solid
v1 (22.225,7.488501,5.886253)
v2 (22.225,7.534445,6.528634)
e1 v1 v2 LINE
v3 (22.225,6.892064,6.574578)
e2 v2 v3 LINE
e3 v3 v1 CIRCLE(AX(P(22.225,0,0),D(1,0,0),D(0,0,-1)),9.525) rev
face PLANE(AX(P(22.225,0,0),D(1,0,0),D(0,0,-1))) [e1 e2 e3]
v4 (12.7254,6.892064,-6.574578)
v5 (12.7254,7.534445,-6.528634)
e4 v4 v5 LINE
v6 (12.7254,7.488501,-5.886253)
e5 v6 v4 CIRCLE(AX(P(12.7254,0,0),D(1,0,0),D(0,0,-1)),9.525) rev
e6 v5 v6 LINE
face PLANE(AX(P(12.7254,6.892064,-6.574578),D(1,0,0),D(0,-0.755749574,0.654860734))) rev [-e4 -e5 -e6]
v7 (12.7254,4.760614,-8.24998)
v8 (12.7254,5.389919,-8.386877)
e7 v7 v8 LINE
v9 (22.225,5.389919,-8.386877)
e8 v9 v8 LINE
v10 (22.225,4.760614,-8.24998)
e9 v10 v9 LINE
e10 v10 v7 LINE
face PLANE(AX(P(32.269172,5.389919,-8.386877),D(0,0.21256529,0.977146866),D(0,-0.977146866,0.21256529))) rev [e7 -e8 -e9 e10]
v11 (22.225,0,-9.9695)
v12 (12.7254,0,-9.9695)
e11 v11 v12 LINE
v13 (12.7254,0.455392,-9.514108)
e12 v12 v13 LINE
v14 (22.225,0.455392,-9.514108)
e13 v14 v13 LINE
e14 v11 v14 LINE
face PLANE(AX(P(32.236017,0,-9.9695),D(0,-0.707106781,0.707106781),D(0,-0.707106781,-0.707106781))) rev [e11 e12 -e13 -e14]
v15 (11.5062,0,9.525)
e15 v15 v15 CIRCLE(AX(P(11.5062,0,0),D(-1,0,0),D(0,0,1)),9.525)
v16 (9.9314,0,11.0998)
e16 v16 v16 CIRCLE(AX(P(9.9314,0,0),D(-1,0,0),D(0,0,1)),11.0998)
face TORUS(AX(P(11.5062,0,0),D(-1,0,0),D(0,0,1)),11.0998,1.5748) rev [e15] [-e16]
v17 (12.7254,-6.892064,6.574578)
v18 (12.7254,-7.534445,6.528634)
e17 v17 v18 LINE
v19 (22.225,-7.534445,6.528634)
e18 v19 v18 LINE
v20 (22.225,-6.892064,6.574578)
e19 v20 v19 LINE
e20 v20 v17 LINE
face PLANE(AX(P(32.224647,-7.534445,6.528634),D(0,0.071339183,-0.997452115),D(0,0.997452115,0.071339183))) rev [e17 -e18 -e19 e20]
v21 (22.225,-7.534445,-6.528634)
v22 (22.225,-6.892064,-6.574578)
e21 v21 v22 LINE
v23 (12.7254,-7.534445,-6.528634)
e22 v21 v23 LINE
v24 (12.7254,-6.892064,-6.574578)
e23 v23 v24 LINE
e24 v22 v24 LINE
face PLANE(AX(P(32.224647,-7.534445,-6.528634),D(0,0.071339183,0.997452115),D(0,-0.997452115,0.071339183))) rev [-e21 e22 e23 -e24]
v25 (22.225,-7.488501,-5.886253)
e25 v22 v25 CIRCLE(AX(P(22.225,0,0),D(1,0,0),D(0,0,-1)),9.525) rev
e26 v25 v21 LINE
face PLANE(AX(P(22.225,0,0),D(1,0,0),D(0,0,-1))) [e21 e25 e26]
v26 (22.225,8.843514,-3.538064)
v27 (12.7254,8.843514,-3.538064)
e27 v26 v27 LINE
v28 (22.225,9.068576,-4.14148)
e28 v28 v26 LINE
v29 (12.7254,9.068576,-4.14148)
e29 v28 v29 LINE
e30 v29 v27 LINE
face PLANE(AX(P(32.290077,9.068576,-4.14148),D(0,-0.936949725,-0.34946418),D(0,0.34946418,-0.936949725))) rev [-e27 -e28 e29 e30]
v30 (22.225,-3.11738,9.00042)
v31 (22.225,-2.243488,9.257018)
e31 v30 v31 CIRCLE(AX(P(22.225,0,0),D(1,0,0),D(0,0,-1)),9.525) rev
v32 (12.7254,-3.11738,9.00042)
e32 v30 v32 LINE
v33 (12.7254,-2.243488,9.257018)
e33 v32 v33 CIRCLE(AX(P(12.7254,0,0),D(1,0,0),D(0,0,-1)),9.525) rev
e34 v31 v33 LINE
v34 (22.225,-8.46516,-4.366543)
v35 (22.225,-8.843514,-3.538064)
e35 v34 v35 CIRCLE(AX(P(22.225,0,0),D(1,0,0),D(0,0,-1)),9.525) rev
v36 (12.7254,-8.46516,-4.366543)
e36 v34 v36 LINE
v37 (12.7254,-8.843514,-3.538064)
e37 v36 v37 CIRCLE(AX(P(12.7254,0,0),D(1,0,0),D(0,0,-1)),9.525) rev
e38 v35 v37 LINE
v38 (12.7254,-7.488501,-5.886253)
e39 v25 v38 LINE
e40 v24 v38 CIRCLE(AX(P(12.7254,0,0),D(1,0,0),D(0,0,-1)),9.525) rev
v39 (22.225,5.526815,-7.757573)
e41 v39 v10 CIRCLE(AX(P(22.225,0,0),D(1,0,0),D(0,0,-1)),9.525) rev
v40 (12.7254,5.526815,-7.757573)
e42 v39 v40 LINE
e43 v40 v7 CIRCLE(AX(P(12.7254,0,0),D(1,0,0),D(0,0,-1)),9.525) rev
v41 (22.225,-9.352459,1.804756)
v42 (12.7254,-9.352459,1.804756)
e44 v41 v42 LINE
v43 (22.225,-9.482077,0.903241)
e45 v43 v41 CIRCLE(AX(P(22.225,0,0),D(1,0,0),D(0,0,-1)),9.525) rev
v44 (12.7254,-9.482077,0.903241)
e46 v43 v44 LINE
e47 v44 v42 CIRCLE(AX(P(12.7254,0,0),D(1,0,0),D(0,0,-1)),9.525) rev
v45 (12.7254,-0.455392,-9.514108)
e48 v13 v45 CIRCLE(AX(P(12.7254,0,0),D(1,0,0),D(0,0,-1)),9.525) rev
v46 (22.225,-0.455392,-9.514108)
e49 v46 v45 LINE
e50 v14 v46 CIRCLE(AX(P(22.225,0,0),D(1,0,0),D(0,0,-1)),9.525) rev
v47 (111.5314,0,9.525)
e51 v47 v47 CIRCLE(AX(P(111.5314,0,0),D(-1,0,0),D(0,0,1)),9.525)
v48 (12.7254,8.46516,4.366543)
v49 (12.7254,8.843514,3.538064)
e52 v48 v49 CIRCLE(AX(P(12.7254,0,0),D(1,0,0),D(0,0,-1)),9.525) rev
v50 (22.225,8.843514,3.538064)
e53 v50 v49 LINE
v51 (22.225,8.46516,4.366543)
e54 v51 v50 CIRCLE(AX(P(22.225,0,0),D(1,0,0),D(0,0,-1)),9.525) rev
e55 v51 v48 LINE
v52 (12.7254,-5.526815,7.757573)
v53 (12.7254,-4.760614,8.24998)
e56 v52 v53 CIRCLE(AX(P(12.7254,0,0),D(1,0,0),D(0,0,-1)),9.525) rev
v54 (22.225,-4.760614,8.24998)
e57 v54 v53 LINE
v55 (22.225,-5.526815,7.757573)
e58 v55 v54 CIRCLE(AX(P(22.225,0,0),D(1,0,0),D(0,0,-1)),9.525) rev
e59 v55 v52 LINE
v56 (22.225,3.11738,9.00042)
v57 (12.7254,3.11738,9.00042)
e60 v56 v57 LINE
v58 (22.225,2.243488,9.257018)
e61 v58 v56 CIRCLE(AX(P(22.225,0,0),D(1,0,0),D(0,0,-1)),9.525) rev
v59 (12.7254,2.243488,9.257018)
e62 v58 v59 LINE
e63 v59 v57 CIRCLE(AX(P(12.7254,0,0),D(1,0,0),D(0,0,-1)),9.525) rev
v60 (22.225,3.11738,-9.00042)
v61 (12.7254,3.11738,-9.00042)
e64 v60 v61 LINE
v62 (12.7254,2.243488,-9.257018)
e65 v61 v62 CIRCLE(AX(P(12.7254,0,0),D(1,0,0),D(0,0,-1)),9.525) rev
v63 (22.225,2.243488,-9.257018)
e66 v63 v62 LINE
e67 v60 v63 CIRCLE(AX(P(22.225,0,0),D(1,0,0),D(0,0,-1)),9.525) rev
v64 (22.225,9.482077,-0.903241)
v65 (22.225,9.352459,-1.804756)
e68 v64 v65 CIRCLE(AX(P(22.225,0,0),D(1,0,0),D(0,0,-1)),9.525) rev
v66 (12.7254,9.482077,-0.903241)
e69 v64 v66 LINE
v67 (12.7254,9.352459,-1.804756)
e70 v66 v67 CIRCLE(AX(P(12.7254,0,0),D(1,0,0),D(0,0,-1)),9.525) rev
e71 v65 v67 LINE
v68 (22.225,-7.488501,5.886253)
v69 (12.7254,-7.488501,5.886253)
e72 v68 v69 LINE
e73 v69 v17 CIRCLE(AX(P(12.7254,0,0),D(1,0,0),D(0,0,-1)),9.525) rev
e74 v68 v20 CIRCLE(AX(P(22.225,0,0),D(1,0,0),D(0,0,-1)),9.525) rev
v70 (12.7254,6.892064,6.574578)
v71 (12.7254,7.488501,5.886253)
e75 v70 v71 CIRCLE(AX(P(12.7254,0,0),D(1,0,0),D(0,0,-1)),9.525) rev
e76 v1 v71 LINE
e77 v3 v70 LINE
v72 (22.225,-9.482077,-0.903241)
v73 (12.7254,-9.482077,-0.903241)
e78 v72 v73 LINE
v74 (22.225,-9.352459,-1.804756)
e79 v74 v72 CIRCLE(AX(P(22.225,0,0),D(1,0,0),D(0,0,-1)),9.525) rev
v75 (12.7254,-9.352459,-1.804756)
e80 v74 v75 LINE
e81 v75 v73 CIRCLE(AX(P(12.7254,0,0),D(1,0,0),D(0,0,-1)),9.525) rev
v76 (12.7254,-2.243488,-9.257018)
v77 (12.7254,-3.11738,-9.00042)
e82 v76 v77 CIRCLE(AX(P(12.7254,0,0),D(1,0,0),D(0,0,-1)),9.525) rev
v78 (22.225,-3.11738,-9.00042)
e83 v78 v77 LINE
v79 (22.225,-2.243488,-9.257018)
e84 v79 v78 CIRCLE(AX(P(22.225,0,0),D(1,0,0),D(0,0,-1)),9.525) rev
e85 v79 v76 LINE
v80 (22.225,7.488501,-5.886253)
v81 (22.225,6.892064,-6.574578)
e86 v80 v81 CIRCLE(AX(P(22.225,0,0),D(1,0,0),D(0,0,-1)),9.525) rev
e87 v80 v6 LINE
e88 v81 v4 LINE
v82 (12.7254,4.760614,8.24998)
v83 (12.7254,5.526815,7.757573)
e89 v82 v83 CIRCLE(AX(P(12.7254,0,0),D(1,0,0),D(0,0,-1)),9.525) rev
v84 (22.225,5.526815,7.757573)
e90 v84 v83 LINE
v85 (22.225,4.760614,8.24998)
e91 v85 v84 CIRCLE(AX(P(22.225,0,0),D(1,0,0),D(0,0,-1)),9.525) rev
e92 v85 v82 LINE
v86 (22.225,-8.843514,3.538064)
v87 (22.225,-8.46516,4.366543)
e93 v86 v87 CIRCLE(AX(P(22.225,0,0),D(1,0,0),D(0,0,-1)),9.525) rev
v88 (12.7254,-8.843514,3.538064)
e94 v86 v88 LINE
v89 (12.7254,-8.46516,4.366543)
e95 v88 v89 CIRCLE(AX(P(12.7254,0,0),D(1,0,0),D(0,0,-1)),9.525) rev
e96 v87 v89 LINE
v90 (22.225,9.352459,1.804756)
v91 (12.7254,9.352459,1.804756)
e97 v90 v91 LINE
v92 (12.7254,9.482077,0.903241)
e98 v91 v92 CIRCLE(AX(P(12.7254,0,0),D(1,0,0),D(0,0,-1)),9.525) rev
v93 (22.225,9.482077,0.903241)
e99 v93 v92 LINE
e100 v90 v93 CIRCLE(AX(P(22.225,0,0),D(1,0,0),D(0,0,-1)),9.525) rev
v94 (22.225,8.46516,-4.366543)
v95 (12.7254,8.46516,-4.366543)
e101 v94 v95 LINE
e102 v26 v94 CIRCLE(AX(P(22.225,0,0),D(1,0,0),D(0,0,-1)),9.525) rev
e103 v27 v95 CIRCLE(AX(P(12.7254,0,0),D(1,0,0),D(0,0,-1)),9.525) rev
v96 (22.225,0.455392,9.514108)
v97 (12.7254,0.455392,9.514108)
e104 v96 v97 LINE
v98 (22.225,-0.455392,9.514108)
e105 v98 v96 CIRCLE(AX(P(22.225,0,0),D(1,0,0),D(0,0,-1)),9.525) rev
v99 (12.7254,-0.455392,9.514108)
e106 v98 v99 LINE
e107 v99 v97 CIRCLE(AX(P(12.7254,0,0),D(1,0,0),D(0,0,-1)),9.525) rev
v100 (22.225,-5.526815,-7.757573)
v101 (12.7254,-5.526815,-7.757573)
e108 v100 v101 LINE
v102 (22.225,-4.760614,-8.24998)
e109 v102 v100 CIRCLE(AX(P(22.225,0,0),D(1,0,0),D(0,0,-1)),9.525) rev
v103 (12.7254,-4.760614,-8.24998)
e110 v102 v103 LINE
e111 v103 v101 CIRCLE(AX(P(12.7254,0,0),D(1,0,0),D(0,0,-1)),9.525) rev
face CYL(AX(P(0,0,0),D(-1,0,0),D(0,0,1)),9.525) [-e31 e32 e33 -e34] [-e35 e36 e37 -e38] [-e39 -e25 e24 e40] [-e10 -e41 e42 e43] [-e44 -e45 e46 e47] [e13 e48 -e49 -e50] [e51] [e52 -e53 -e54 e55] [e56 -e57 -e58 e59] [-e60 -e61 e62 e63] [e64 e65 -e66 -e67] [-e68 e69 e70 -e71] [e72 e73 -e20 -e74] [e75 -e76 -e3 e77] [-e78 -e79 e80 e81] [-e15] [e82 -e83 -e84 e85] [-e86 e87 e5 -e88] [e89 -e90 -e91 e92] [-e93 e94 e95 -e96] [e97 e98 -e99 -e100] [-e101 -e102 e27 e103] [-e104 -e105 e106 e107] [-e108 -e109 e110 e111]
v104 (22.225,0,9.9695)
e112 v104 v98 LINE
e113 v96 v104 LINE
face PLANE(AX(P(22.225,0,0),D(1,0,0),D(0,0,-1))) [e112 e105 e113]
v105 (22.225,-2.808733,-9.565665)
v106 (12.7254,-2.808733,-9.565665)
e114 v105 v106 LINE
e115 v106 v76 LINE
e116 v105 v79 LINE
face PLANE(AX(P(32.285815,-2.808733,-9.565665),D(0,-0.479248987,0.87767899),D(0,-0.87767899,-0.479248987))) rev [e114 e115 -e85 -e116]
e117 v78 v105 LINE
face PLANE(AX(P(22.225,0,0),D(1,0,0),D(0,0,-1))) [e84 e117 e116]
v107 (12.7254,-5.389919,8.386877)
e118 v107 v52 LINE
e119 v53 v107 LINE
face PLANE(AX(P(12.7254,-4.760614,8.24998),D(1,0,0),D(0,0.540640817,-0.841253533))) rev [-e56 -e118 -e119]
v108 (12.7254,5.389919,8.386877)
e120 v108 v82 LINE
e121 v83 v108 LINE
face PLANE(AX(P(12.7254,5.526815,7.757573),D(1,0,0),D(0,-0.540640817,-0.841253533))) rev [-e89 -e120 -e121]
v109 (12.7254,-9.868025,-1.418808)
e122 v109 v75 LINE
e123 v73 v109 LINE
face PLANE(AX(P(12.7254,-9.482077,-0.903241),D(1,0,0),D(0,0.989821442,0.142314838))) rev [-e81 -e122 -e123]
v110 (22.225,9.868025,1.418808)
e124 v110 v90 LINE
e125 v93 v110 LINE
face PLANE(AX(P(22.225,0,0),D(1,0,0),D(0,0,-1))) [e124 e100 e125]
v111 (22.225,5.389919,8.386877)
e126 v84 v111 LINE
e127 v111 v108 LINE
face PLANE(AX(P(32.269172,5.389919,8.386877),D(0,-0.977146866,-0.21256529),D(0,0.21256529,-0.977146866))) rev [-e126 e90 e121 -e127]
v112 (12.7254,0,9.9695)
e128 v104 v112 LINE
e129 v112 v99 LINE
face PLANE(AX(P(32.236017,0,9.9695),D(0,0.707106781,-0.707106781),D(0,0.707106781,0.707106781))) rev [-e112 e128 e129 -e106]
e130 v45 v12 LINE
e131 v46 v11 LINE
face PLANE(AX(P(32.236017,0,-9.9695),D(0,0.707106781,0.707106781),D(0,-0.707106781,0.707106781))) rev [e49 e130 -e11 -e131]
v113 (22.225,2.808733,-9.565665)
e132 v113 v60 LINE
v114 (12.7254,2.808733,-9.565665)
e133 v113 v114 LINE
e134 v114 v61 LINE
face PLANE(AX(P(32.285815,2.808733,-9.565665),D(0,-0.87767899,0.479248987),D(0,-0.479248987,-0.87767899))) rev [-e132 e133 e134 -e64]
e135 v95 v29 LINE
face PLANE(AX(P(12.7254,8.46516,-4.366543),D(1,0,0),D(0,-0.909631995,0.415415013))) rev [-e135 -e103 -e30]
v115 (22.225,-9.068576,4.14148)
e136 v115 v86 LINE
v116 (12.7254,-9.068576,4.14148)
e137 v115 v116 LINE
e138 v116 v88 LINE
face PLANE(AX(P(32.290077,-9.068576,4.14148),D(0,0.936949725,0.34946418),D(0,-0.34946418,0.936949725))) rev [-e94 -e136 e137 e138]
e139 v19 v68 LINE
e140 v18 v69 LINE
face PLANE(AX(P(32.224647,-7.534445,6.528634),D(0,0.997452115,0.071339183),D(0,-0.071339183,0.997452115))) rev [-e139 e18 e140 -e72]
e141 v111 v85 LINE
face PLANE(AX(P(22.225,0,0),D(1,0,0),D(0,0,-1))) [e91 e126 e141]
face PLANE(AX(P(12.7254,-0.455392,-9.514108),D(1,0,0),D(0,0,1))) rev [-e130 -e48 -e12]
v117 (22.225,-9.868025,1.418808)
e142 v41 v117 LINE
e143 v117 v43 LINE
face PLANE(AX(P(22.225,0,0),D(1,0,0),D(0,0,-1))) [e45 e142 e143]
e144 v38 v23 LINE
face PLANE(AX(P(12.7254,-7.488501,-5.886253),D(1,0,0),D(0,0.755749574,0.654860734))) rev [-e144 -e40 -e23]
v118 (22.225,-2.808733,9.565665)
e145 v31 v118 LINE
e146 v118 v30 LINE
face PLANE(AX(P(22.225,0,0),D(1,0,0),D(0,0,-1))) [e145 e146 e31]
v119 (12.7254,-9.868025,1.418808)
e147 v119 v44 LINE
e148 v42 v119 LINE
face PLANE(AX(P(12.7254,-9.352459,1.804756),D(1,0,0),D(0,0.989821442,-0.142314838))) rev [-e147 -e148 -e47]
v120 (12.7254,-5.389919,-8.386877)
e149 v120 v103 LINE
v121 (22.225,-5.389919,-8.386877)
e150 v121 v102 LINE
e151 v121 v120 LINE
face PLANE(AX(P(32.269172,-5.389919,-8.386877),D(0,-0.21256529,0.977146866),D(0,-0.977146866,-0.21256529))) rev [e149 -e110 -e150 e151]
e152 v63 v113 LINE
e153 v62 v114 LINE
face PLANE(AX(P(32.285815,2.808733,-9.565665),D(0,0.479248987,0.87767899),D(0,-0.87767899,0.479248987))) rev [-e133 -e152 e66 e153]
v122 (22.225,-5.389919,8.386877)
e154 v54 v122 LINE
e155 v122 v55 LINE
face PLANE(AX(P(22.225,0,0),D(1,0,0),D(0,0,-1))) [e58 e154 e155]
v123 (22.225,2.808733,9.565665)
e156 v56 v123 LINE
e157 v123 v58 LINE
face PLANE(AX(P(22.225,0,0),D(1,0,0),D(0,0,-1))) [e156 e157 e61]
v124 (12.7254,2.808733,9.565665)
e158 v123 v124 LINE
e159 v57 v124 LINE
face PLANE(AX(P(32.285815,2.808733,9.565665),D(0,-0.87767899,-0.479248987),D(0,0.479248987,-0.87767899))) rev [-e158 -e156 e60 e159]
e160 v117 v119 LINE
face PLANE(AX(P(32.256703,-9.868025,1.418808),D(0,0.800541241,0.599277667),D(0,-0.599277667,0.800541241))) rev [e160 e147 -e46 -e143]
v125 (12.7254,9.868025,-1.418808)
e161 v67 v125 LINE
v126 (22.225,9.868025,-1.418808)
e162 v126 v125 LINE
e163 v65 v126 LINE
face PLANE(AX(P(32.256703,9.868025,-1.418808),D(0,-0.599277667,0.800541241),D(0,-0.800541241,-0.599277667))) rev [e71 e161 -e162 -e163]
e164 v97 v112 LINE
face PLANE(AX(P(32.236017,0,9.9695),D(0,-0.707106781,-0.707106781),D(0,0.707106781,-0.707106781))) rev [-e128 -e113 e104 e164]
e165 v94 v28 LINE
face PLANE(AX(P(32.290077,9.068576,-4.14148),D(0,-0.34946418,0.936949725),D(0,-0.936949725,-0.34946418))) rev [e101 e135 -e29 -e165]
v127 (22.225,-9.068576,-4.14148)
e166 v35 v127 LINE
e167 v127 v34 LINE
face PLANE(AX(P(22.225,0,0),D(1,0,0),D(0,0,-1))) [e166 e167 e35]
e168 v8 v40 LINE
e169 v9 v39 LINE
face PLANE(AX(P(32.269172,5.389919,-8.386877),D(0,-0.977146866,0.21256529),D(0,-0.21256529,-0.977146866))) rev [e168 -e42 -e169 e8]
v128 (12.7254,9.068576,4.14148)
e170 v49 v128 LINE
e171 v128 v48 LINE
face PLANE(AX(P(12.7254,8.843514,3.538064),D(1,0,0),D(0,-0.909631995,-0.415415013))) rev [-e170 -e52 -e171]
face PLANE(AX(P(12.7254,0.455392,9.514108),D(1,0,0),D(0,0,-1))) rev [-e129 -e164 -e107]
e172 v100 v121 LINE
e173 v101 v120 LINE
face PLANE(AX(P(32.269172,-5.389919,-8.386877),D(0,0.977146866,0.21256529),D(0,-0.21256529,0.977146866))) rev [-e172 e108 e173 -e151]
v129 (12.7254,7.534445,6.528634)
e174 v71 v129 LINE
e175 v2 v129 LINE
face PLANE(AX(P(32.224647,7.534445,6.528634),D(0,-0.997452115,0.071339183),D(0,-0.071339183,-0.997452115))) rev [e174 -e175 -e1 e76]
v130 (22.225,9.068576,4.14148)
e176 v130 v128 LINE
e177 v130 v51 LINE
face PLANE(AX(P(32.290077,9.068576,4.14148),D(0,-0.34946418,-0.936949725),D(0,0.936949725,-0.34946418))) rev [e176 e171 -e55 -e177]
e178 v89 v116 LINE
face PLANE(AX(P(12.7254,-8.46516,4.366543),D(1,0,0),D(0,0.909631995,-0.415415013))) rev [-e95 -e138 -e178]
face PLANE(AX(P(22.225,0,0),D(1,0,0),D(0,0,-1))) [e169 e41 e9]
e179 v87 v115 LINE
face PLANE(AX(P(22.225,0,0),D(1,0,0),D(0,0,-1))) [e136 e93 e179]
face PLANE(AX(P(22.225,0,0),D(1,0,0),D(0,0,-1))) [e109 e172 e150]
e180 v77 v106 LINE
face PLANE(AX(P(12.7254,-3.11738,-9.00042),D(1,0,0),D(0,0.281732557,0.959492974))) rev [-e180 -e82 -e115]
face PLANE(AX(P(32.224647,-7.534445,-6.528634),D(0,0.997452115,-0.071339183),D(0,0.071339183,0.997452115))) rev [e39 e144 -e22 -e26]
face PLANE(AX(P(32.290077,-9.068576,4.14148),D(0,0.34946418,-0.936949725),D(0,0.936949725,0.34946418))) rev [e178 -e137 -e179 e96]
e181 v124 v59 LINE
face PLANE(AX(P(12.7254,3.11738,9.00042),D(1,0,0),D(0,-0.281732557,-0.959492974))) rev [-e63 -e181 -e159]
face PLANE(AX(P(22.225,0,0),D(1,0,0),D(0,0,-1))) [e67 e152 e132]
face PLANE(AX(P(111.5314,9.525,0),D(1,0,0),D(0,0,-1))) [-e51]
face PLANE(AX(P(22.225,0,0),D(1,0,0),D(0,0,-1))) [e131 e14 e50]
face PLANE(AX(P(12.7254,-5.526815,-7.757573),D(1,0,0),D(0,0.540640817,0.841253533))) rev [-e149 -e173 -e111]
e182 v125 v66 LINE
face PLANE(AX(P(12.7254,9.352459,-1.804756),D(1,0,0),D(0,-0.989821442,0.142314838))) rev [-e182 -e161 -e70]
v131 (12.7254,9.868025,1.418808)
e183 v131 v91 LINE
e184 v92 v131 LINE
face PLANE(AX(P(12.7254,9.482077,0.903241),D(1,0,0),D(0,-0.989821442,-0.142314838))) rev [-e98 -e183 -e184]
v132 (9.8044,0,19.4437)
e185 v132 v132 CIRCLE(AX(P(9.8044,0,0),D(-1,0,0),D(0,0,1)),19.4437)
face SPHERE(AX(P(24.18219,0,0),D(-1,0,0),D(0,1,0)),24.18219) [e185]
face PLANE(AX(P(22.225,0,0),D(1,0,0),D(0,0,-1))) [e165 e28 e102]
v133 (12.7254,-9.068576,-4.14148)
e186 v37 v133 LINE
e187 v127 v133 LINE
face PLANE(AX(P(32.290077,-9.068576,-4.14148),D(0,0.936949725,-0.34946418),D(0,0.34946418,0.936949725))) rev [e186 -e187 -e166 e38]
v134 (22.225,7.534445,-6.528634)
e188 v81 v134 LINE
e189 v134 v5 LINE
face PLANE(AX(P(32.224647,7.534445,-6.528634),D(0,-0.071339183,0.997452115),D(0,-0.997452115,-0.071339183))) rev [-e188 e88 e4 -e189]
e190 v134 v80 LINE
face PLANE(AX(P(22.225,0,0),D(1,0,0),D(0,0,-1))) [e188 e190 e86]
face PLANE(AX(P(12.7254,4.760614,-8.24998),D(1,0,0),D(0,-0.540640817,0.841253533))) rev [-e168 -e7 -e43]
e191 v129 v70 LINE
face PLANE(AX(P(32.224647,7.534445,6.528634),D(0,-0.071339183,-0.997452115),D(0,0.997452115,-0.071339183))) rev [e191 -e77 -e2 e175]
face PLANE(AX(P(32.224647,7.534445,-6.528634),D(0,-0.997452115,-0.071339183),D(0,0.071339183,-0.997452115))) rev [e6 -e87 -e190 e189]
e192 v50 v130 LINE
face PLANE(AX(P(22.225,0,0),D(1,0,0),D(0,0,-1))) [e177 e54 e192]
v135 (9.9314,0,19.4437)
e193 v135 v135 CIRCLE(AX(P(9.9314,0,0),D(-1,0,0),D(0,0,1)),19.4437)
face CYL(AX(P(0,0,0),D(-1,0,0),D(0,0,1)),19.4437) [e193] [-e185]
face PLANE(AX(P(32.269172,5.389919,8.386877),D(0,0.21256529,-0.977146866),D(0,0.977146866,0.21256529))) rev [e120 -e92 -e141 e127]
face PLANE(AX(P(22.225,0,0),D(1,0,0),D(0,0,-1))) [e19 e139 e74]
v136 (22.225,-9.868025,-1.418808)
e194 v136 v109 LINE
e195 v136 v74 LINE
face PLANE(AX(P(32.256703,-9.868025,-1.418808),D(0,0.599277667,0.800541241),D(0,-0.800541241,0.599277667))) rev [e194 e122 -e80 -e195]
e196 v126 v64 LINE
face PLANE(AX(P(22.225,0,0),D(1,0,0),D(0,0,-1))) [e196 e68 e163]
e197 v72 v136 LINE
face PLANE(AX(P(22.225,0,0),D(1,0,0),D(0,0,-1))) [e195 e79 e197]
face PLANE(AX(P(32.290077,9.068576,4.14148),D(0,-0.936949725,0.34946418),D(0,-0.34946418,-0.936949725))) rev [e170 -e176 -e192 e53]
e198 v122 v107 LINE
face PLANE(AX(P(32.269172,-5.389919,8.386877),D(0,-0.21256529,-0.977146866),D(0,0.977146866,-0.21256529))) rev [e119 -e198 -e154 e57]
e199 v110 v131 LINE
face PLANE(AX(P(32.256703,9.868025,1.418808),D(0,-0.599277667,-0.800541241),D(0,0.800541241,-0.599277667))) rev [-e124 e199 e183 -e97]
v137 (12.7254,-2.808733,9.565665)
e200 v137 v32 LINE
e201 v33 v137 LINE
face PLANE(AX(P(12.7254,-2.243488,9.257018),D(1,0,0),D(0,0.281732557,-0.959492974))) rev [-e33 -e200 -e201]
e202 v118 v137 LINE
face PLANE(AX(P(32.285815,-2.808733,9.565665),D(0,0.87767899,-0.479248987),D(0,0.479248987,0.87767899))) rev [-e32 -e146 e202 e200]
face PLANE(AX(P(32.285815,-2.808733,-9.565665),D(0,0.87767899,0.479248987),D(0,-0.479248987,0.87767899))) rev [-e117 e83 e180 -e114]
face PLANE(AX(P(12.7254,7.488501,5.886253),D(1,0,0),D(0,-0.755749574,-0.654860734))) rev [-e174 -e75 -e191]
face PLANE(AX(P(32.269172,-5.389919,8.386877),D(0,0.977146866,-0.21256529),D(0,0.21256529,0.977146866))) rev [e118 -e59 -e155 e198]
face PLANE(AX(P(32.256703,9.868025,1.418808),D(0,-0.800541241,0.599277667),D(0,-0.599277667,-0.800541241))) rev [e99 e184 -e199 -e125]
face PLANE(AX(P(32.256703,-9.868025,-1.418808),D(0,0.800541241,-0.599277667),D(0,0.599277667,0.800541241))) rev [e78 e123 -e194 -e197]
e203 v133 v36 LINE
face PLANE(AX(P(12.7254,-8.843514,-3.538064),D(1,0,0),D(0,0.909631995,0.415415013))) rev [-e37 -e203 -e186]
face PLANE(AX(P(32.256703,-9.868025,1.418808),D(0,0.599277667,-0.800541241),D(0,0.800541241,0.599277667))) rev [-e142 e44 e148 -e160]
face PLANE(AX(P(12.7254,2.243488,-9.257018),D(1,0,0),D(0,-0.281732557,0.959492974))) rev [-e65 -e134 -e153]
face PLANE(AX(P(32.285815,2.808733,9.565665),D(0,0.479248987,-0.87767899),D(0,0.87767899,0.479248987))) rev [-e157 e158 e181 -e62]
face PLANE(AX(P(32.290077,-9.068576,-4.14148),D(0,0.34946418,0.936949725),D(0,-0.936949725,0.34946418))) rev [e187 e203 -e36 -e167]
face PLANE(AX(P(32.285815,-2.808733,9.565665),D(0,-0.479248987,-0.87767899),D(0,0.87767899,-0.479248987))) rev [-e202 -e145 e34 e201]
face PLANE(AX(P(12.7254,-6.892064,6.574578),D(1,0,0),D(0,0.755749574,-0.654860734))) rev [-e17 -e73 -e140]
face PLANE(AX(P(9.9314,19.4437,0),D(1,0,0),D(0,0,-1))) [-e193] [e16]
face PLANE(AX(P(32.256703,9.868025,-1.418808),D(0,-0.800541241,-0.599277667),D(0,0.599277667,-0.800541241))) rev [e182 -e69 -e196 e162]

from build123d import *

# Parameters (mm, degrees)
BOSS_EXTRUDE1_DEPTH = 9.4996
CIRPATTERN1_COUNT   = 22


# Read off the part's stored shape, not the designer's step: ThreadSchematic
with BuildPart() as part:
    # ThreadSchematic outline → ThreadSchematic (revolve)
    with BuildSketch(Plane.YX):
        with BuildLine():
            Line((0, 111.5314), (0, 0))
            ThreePointArc((0, 0), (10.887880066, 2.589775097), (19.443700005, 9.804400006))
            Line((19.443700005, 9.804400006), (19.4437, 9.9314))
            Line((19.4437, 9.9314), (11.0998, 9.9314))
            ThreePointArc((11.0998, 9.9314), (9.986248241, 10.392648241), (9.525, 11.5062))
            Line((9.525, 11.5062), (9.525, 111.5314))
            Line((9.525, 111.5314), (0, 111.5314))
        make_face()
    revolve(axis=Axis((0, 0, 0), (1, 0, 0)))

    # Sketch2 → Boss-Extrude1 (add)
    with BuildSketch(Plane(origin=(12.7254, 0, 0), x_dir=(0, 0, -1), z_dir=(1, 0, 0))):
        Polygon((-9.9695, 0), (-9.514107563, -0.455392437), (0, 0), (-9.514107563, 0.455392437), align=None)
    boss_extrude1 = extrude(amount=BOSS_EXTRUDE1_DEPTH)

    # CirPattern1: Boss-Extrude1 ×22 about axis
    cirpattern1_axis = Axis((0, 0, 0), (1, 0, 0))
    for i in range(1, CIRPATTERN1_COUNT):
        add(boss_extrude1.rotate(cirpattern1_axis, i * 360 / CIRPATTERN1_COUNT))


solid = part.part
